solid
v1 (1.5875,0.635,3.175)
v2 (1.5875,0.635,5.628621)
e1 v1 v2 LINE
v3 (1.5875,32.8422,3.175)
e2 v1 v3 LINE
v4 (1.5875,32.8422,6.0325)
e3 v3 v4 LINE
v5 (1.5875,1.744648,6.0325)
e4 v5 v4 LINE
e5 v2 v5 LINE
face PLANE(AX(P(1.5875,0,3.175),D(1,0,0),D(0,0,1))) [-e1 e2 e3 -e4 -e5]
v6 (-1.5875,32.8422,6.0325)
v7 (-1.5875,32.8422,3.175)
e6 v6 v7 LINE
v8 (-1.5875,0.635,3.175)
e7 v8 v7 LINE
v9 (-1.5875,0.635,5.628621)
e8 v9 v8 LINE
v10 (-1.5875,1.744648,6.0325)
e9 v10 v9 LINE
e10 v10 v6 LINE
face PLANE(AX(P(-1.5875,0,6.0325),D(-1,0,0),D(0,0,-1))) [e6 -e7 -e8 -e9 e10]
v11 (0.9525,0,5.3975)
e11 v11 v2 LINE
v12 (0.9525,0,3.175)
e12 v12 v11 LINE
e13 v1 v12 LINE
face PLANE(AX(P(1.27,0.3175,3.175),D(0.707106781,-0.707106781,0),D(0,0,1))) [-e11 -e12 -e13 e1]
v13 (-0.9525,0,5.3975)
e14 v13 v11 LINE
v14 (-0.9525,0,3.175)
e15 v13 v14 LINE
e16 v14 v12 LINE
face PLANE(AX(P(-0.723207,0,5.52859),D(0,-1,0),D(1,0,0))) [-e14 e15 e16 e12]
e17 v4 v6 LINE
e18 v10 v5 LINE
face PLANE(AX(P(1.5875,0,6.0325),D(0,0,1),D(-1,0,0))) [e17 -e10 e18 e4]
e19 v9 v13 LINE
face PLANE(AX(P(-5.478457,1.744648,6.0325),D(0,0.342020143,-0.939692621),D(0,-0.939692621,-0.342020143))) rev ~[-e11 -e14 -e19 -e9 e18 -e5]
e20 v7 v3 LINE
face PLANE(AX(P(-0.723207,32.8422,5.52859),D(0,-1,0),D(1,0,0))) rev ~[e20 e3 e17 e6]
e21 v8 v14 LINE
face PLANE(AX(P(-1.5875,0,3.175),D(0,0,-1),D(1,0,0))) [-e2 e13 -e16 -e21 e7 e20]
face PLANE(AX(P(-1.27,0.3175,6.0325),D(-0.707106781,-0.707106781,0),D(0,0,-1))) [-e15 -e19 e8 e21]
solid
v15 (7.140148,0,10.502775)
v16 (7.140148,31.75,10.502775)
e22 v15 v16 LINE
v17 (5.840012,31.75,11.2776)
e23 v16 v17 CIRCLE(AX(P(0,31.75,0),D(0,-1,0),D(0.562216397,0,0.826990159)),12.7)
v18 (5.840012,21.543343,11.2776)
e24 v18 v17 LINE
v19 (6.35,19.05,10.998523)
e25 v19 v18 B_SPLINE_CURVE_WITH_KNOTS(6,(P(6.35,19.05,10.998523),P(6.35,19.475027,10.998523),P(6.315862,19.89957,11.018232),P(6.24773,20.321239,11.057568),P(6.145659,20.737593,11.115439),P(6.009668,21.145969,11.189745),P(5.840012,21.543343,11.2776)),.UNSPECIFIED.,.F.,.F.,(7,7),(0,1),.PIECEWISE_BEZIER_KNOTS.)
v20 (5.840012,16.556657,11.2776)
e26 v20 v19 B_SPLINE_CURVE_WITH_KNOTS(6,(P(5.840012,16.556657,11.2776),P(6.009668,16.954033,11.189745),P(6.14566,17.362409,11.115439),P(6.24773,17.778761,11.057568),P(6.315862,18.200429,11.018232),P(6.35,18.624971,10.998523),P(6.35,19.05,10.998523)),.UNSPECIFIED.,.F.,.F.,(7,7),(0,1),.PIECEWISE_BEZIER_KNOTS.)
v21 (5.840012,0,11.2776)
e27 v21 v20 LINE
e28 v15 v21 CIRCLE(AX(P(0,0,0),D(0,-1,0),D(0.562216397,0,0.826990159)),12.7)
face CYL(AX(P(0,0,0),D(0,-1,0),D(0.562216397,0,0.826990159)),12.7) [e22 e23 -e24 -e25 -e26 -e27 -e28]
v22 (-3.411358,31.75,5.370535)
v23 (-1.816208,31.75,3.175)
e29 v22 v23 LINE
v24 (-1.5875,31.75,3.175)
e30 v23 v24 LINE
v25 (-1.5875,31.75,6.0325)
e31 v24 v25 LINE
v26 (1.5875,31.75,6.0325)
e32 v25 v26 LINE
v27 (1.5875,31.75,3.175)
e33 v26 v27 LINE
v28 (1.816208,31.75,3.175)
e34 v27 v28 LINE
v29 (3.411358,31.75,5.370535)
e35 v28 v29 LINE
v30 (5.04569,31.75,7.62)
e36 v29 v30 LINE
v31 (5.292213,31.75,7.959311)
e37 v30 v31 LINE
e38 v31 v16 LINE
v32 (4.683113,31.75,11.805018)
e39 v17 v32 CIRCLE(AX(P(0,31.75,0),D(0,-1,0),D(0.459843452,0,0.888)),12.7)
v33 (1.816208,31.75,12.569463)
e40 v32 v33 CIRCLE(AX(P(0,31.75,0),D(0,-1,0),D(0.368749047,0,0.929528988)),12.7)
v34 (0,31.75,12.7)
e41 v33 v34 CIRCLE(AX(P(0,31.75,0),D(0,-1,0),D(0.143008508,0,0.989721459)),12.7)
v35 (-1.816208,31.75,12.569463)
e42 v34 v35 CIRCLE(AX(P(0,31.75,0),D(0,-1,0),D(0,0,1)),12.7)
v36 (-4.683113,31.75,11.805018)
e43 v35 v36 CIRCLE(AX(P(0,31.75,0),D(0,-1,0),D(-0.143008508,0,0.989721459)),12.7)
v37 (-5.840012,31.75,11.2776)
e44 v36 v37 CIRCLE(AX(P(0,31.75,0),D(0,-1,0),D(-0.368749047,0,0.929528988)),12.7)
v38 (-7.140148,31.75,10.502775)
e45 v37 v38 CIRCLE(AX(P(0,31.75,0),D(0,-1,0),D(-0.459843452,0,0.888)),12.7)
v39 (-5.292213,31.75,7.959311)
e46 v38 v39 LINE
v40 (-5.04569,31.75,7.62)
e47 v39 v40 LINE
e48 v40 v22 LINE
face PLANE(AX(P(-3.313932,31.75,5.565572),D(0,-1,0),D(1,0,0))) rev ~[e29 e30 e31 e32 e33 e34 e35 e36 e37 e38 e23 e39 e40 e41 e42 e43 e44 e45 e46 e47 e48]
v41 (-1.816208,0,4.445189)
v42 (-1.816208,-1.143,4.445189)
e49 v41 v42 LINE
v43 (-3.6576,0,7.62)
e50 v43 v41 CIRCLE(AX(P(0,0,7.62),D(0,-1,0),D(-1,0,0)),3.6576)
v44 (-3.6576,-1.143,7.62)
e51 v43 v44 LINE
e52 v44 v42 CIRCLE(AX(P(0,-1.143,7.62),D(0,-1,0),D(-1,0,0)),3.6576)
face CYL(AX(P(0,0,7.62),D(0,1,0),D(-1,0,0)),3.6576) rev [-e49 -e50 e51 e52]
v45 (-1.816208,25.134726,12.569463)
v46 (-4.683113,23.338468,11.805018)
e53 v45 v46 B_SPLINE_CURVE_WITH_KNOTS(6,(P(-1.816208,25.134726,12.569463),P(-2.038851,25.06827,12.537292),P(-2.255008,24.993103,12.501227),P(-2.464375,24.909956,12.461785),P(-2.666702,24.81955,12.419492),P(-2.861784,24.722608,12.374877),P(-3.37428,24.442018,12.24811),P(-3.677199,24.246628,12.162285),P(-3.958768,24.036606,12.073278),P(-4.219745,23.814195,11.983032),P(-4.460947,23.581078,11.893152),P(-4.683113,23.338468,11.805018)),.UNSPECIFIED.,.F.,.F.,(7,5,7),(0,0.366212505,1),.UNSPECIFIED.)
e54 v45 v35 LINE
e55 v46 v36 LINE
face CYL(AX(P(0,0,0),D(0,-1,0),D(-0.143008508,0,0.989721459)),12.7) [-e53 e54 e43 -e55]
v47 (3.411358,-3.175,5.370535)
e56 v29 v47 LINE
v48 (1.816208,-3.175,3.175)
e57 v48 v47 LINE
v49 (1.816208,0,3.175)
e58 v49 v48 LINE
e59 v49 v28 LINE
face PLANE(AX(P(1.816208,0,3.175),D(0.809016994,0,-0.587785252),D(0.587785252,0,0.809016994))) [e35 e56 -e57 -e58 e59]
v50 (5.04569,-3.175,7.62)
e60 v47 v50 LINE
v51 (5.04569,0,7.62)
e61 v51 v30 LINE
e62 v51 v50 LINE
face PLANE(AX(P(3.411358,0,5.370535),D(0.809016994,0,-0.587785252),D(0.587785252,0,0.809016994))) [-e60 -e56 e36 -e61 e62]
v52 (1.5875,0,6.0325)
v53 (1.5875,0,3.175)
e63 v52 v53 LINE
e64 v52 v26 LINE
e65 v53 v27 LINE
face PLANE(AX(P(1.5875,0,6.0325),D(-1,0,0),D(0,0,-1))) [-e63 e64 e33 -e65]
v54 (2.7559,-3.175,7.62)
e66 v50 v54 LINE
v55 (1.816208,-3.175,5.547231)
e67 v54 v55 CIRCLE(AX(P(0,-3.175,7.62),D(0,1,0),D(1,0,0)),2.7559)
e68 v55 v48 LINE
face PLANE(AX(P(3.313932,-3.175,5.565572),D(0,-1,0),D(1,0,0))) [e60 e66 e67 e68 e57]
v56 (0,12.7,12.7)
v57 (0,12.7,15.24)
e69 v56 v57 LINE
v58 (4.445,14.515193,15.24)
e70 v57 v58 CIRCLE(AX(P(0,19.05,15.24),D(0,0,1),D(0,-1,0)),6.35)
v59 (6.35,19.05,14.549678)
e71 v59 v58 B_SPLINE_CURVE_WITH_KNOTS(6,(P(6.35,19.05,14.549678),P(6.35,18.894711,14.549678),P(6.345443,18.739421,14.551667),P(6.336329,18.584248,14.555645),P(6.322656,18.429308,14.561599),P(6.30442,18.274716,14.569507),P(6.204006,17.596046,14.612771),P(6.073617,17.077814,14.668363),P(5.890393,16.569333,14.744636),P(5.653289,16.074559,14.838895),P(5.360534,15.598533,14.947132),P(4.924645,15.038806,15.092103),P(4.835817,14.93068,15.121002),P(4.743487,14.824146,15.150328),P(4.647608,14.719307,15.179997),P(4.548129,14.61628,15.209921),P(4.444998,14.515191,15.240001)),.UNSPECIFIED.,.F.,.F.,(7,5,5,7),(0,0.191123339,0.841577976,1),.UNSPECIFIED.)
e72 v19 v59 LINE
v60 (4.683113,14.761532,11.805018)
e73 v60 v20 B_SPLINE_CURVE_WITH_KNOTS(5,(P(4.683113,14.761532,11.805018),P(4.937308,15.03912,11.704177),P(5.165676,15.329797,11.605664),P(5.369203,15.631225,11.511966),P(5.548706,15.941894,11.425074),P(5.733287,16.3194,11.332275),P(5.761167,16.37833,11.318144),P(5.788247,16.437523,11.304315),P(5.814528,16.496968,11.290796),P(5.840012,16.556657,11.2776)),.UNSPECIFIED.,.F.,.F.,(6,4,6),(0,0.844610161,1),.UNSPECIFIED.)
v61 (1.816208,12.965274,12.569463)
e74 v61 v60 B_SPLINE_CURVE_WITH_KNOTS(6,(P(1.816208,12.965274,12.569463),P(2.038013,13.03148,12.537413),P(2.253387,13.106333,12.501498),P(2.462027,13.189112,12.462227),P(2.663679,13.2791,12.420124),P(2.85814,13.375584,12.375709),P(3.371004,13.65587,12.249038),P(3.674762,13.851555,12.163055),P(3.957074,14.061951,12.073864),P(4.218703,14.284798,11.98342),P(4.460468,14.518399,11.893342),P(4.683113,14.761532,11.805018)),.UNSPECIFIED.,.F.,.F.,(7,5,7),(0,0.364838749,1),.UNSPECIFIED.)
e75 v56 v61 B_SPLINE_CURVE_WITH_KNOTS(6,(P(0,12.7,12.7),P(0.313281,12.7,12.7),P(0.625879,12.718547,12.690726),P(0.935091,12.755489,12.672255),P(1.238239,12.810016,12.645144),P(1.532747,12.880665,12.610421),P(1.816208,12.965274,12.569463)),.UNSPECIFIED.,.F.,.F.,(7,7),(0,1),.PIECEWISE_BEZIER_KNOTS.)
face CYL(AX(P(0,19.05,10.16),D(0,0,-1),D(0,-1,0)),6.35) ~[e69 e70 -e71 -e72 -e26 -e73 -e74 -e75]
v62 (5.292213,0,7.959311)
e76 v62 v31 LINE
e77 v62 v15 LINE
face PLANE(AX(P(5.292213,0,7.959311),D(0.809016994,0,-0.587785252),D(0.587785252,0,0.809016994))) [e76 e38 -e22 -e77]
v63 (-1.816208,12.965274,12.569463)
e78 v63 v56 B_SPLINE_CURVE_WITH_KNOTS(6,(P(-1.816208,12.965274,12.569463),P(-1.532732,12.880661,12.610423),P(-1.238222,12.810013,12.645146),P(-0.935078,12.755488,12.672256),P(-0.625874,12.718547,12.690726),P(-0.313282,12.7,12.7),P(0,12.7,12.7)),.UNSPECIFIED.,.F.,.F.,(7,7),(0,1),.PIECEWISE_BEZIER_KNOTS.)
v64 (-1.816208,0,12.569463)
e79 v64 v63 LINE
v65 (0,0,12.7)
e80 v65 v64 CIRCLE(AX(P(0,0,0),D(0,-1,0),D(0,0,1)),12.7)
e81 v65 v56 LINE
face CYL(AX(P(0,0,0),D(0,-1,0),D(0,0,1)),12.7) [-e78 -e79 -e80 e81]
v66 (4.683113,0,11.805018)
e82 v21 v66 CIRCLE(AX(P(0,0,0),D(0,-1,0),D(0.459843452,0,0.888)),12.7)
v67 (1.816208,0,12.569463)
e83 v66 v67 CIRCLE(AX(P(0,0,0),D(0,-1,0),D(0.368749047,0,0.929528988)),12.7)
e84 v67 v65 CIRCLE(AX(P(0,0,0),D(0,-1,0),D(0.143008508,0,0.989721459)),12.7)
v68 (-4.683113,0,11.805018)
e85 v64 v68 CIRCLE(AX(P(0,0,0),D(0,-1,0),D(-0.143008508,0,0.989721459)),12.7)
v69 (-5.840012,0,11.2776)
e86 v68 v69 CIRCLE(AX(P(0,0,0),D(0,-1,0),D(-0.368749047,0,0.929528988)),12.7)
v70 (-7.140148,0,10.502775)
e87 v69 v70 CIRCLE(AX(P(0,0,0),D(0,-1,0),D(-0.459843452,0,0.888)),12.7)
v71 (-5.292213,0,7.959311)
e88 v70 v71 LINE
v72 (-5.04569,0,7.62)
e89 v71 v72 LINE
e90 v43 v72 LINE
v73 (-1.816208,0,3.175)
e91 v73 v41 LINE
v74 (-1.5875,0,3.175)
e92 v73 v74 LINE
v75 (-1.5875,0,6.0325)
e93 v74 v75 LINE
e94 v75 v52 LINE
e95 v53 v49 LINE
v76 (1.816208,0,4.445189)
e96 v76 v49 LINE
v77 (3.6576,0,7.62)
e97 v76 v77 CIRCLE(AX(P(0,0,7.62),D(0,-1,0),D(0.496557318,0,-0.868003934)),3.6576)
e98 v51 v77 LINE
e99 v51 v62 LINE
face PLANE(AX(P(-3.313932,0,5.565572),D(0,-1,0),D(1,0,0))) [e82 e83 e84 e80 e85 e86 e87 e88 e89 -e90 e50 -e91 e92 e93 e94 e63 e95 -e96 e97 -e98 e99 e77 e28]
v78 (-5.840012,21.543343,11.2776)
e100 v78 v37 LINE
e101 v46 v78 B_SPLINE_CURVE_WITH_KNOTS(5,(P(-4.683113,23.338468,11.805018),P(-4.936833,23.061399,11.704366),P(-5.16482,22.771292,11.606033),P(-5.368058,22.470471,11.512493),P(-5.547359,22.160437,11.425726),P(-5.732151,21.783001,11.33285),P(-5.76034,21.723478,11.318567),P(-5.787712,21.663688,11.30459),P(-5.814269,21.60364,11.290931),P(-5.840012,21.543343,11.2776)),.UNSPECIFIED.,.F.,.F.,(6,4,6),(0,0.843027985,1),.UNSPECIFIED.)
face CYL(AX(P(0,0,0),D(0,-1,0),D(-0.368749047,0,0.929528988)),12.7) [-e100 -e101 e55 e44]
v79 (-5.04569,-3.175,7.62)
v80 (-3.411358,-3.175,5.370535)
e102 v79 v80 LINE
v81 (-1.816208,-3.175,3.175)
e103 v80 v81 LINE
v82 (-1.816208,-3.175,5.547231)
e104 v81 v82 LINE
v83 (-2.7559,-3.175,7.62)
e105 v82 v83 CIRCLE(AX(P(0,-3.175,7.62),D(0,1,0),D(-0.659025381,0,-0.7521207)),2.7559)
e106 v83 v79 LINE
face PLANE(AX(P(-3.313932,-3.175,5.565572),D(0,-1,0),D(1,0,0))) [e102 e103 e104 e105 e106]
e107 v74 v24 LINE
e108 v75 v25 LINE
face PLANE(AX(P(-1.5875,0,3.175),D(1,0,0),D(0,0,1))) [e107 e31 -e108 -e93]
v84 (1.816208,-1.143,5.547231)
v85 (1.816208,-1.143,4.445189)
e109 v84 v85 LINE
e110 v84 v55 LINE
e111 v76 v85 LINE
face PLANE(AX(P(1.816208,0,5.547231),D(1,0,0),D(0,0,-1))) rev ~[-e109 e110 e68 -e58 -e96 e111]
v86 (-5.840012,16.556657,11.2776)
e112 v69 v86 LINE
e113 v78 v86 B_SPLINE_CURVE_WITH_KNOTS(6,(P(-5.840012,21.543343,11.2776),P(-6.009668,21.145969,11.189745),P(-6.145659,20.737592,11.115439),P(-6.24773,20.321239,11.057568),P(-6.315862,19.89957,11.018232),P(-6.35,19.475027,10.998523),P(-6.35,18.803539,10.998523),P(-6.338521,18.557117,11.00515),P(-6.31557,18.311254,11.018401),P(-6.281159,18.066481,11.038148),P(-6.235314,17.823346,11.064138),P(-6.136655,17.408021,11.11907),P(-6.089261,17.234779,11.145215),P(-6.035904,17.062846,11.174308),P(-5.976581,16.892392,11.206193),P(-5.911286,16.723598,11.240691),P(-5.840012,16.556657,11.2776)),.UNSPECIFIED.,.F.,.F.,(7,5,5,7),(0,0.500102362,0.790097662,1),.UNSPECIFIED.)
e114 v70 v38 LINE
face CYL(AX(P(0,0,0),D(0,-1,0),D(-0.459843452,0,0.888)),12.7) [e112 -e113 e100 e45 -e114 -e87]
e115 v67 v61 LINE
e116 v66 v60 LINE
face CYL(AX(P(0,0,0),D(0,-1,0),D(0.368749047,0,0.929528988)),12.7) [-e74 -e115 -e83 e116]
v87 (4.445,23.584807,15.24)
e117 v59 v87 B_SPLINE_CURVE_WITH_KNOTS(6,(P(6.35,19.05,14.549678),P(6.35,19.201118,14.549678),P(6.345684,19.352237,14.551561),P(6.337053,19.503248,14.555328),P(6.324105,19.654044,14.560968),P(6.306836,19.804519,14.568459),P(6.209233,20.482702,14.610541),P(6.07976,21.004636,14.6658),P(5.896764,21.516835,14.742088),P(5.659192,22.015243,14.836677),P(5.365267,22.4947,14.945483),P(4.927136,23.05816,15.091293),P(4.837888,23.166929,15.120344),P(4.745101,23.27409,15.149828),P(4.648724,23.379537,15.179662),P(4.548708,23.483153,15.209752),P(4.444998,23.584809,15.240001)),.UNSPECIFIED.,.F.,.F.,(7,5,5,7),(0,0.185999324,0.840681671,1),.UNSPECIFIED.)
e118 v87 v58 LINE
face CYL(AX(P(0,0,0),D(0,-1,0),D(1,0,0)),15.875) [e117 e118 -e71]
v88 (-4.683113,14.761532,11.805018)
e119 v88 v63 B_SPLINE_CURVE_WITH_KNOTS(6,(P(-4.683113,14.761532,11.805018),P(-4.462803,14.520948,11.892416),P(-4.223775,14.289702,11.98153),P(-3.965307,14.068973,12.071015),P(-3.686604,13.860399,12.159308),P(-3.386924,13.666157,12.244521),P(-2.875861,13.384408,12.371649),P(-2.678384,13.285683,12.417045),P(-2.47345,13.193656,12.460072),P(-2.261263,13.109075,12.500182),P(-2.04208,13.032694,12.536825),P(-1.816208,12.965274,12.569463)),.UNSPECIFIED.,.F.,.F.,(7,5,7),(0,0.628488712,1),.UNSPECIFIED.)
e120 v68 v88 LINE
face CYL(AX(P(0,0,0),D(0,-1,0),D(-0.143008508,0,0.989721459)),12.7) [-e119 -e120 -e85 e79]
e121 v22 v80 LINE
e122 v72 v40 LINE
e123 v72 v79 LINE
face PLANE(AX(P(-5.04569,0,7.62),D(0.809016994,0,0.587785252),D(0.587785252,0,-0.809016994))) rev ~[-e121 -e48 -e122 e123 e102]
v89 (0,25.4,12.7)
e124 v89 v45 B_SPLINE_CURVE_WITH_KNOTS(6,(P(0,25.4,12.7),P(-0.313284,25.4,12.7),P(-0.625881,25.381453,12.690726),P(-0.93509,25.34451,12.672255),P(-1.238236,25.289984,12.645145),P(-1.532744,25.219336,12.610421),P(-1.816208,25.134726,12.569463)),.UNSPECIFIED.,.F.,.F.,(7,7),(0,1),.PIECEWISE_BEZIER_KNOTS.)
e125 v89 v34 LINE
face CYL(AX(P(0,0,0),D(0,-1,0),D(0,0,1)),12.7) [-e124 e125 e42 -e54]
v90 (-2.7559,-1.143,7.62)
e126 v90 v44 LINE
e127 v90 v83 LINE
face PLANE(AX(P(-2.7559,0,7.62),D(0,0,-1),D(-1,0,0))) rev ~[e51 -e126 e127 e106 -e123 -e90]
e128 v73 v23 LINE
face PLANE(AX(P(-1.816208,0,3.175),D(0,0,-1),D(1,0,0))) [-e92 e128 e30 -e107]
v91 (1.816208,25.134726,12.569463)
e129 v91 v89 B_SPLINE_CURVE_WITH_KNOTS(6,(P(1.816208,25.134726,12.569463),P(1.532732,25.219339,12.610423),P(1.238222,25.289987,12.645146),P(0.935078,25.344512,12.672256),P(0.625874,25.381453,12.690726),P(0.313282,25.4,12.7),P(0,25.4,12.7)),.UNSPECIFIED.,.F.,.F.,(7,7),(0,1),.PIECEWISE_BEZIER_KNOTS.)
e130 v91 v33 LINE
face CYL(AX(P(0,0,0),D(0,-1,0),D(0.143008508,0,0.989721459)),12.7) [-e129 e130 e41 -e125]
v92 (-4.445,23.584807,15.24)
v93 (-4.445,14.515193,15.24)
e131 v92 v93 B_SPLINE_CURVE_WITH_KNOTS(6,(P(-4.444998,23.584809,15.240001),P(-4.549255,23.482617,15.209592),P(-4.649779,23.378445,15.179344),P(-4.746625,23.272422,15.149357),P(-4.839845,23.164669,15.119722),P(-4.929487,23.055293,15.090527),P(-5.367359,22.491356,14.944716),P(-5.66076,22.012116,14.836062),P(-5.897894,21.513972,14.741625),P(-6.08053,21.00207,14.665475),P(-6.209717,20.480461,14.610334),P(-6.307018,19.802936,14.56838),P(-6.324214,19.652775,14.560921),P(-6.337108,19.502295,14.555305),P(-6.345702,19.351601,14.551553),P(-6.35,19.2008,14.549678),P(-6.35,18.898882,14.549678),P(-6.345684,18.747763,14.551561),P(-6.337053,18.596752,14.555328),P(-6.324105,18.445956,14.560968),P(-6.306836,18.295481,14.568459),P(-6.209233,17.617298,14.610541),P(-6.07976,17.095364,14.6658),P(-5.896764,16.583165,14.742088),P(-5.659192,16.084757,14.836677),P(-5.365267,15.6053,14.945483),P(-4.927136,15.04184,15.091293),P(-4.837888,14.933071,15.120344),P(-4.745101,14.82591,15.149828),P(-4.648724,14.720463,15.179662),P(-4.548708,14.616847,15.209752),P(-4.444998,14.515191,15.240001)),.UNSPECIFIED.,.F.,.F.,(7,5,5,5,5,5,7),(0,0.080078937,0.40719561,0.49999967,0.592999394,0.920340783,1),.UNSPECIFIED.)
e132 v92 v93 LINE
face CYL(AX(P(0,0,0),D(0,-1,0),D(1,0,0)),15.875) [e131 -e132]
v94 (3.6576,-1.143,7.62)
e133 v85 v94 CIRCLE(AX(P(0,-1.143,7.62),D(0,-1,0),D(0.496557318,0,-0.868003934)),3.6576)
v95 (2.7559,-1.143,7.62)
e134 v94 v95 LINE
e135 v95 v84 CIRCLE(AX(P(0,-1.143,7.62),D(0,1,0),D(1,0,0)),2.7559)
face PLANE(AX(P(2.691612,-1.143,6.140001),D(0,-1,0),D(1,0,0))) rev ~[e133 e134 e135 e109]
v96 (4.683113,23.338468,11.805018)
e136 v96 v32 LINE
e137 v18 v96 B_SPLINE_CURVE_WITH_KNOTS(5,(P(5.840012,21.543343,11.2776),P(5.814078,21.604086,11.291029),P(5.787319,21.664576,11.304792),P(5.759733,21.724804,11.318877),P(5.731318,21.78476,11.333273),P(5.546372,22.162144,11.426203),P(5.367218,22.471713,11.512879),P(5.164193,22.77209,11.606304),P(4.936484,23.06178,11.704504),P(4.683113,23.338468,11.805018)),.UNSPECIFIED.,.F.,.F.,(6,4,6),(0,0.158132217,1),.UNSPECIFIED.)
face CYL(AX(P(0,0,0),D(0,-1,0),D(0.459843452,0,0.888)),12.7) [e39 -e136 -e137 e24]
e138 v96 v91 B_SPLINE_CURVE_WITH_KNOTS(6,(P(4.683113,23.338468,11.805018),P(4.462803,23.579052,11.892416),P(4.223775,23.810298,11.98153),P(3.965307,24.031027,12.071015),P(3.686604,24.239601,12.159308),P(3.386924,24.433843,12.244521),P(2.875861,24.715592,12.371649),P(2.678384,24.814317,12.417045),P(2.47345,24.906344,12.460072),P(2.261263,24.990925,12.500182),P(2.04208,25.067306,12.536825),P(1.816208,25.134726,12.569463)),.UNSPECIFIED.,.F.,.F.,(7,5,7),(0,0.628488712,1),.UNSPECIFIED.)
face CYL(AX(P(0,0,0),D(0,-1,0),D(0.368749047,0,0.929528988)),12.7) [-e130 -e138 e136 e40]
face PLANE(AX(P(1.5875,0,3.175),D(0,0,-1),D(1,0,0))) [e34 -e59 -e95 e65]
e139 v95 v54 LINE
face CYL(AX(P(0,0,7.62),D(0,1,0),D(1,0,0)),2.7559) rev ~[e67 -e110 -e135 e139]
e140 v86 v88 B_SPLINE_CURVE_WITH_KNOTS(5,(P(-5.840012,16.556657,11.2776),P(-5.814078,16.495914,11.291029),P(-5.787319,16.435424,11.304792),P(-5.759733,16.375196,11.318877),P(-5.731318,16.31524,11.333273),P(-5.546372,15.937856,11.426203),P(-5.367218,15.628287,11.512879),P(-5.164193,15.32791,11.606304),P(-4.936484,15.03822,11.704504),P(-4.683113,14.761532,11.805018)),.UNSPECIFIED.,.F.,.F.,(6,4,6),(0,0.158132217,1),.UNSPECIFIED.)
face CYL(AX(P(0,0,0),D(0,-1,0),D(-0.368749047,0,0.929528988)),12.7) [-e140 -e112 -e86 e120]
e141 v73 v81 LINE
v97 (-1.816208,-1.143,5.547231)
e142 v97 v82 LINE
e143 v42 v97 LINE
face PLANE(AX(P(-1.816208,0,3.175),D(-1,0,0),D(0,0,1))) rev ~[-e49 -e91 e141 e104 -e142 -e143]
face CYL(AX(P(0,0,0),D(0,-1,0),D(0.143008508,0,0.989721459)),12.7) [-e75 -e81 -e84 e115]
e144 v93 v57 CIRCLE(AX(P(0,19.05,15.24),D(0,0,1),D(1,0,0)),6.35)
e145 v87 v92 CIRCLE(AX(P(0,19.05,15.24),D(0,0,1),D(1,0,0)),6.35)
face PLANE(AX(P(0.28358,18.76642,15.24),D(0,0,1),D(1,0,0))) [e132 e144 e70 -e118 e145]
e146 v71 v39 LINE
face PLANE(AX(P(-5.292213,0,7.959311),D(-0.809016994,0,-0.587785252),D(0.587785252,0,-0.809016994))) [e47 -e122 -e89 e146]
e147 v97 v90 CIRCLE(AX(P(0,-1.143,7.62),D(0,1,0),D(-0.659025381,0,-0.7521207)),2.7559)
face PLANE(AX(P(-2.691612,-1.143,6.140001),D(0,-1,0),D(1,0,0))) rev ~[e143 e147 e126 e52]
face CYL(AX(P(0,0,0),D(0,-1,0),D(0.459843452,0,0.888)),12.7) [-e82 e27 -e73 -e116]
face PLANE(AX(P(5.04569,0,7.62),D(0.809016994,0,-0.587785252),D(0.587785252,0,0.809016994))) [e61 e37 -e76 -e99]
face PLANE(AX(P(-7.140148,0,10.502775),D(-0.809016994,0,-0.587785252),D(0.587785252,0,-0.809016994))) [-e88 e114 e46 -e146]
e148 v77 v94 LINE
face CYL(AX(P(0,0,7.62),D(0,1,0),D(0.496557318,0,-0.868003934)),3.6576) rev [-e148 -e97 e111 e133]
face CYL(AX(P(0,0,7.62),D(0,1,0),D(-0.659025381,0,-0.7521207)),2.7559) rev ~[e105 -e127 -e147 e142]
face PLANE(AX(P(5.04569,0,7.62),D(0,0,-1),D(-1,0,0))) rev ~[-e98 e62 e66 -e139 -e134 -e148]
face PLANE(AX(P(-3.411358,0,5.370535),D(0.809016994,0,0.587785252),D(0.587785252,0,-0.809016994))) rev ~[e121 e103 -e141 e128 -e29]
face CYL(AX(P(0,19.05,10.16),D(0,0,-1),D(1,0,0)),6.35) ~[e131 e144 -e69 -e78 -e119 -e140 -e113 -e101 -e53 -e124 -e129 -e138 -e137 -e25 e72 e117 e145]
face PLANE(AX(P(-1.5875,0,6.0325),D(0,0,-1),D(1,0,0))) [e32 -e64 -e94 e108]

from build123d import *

# Parameters (mm, degrees)
F1_DEPTH     = 31.75
F2_DEPTH     = 3.175
F3_DEPTH     = 1.143
F4_DEPTH     = 32.8422
F7_DEPTH     = 5.08
F8_R         = 19.05
F8_R_2       = 15.875
F9_DEPTH     = 50.8
F11_SIZE     = 0.635
F12_T1_DEPTH = 10.9569141407


# Not quite as in the source:
# - a fillet or chamfer that OpenCascade refuses, or shapes differently, is made with other operations: its cross-section is extruded or revolved along the edge and cut away or added


with BuildPart() as f1:
    # F0 (on Front) → F1 (new body)
    with BuildSketch(Plane.XZ):
        with BuildLine():
            Line((-3.96875, 7.62), (-5.0456895848, 7.62))
            Line((-5.0456895848, 7.62), (-3.4113577324, 5.3705351863))
            Line((-3.4113577324, 5.3705351863), (-1.8162080478, 3.175))
            Line((-1.8162080478, 3.175), (-1.8162080478, 4.0912091463))
            ThreePointArc((-1.8162080478, 4.0912091463), (-3.3881449388, 5.5532512402), (-3.96875, 7.62))
        make_face()
        with BuildLine():
            Line((-5.2922131397, 7.9593105639), (-5.0456895848, 7.62))
            Line((-5.0456895848, 7.62), (-3.96875, 7.62))
            ThreePointArc((-3.96875, 7.62), (-3.3881449388, 9.6867487598), (-1.8162080478, 11.1487908537))
            Line((-1.8162080478, 11.1487908537), (-1.8162080478, 11.2776))
            Line((-1.8162080478, 11.2776), (-4.4524904002, 11.2776))
            ThreePointArc((-4.4524904002, 11.2776), (-4.386898372, 9.4956069696), (-5.2922131397, 7.9593105639))
        make_face()
        with BuildLine():
            Line((-1.8162080478, 4.0912091463), (-1.8162080478, 3.175))
            Line((-1.8162080478, 3.175), (-1.5875, 3.175))
            Line((-1.5875, 3.175), (-1.5875, 3.9825805421))
            ThreePointArc((-1.5875, 3.9825805421), (-1.7027205179, 4.0350705167), (-1.8162080478, 4.0912091463))
        make_face()
        with BuildLine():
            Line((3.96875, 7.62), (5.0456895848, 7.62))
            Line((5.0456895848, 7.62), (5.2922131397, 7.9593105639))
            ThreePointArc((5.2922131397, 7.9593105639), (4.386898372, 9.4956069696), (4.4524904002, 11.2776))
            Line((4.4524904002, 11.2776), (1.8162080478, 11.2776))
            Line((1.8162080478, 11.2776), (1.8162080478, 11.1487908537))
            ThreePointArc((1.8162080478, 11.1487908537), (3.3881449388, 9.6867487598), (3.96875, 7.62))
        make_face()
        with BuildLine():
            Line((3.4113577324, 5.3705351863), (5.0456895848, 7.62))
            Line((5.0456895848, 7.62), (3.96875, 7.62))
            ThreePointArc((3.96875, 7.62), (3.3881449388, 5.5532512402), (1.8162080478, 4.0912091463))
            Line((1.8162080478, 4.0912091463), (1.8162080478, 3.175))
            Line((1.8162080478, 3.175), (3.4113577324, 5.3705351863))
        make_face()
        with BuildLine():
            Line((1.5875, 3.175), (1.8162080478, 3.175))
            Line((1.8162080478, 3.175), (1.8162080478, 4.0912091463))
            ThreePointArc((1.8162080478, 4.0912091463), (1.7027205179, 4.0350705167), (1.5875, 3.9825805421))
            Line((1.5875, 3.9825805421), (1.5875, 3.175))
        make_face()
        with BuildLine():
            Line((-7.1401482368, 10.5027750217), (-5.2922131397, 7.9593105639))
            ThreePointArc((-5.2922131397, 7.9593105639), (-4.386898372, 9.4956069696), (-4.4524904002, 11.2776))
            Line((-4.4524904002, 11.2776), (-5.8400118356, 11.2776))
            ThreePointArc((-5.8400118356, 11.2776), (-6.5016326652, 10.9095725254), (-7.1401482368, 10.5027750217))
        make_face()
        with BuildLine():
            Line((-3.6576, 7.62), (-3.96875, 7.62))
            ThreePointArc((-3.96875, 7.62), (-3.3881449388, 5.5532512402), (-1.8162080478, 4.0912091463))
            Line((-1.8162080478, 4.0912091463), (-1.8162080478, 4.4451888108))
            ThreePointArc((-1.8162080478, 4.4451888108), (-3.1639374453, 5.7849148243), (-3.6576, 7.62))
        make_face()
        with BuildLine():
            ThreePointArc((-1.8162080478, 11.1487908537), (-3.3881449388, 9.6867487598), (-3.96875, 7.62))
            Line((-3.96875, 7.62), (-3.6576, 7.62))
            ThreePointArc((-3.6576, 7.62), (-3.1639374453, 9.4550851757), (-1.8162080478, 10.7948111892))
            Line((-1.8162080478, 10.7948111892), (-1.8162080478, 11.1487908537))
        make_face()
        with BuildLine():
            Line((-1.8162080478, 4.4451888108), (-1.8162080478, 4.0912091463))
            ThreePointArc((-1.8162080478, 4.0912091463), (-1.7027205179, 4.0350705167), (-1.5875, 3.9825805421))
            Line((-1.5875, 3.9825805421), (-1.5875, 4.3248700314))
            ThreePointArc((-1.5875, 4.3248700314), (-1.7029169889, 4.3830088834), (-1.8162080478, 4.4451888108))
        make_face()
        with BuildLine():
            ThreePointArc((4.4524904002, 11.2776), (4.386898372, 9.4956069696), (5.2922131397, 7.9593105639))
            Line((5.2922131397, 7.9593105639), (7.1401482368, 10.5027750217))
            ThreePointArc((7.1401482368, 10.5027750217), (6.5016326652, 10.9095725254), (5.8400118356, 11.2776))
            Line((5.8400118356, 11.2776), (4.4524904002, 11.2776))
        make_face()
        with BuildLine():
            Line((3.6576, 7.62), (3.96875, 7.62))
            ThreePointArc((3.96875, 7.62), (3.3881449388, 9.6867487598), (1.8162080478, 11.1487908537))
            Line((1.8162080478, 11.1487908537), (1.8162080478, 10.7948111892))
            ThreePointArc((1.8162080478, 10.7948111892), (3.1639374453, 9.4550851757), (3.6576, 7.62))
        make_face()
        with BuildLine():
            ThreePointArc((1.8162080478, 4.0912091463), (3.3881449388, 5.5532512402), (3.96875, 7.62))
            Line((3.96875, 7.62), (3.6576, 7.62))
            ThreePointArc((3.6576, 7.62), (3.1639374453, 5.7849148243), (1.8162080478, 4.4451888108))
            Line((1.8162080478, 4.4451888108), (1.8162080478, 4.0912091463))
        make_face()
        with BuildLine():
            ThreePointArc((1.5875, 3.9825805421), (1.7027205179, 4.0350705167), (1.8162080478, 4.0912091463))
            Line((1.8162080478, 4.0912091463), (1.8162080478, 4.4451888108))
            ThreePointArc((1.8162080478, 4.4451888108), (1.7029169889, 4.3830088834), (1.5875, 4.3248700314))
            Line((1.5875, 4.3248700314), (1.5875, 3.9825805421))
        make_face()
        with BuildLine():
            ThreePointArc((-4.6831128955, 11.8050181537), (-4.5558242029, 11.5465464169), (-4.4524904002, 11.2776))
            Line((-4.4524904002, 11.2776), (-1.8162080478, 11.2776))
            Line((-1.8162080478, 11.2776), (-1.8162080478, 12.5694625313))
            ThreePointArc((-1.8162080478, 12.5694625313), (-3.2720615799, 12.2712514854), (-4.6831128955, 11.8050181537))
        make_face()
        with BuildLine():
            Line((-5.8400118356, 11.2776), (-4.4524904002, 11.2776))
            ThreePointArc((-4.4524904002, 11.2776), (-4.5558242029, 11.5465464169), (-4.6831128955, 11.8050181537))
            ThreePointArc((-4.6831128955, 11.8050181537), (-5.2681667593, 11.5557959049), (-5.8400118356, 11.2776))
        make_face()
        with BuildLine():
            Line((-1.8162080478, 11.2776), (-1.8162080478, 11.1487908537))
            ThreePointArc((-1.8162080478, 11.1487908537), (-1.6795566201, 11.2158401136), (-1.5404346148, 11.2776))
            Line((-1.5404346148, 11.2776), (-1.8162080478, 11.2776))
        make_face()
        with BuildLine():
            ThreePointArc((-1.5404346148, 11.2776), (-1.6795566201, 11.2158401136), (-1.8162080478, 11.1487908537))
            Line((-1.8162080478, 11.1487908537), (-1.8162080478, 10.7948111892))
            ThreePointArc((-1.8162080478, 10.7948111892), (-0.939640451, 11.1548427946), (0, 11.2776))
            Line((0, 11.2776), (-1.5404346148, 11.2776))
        make_face()
        with BuildLine():
            Line((-2.7559, 7.62), (-3.6576, 7.62))
            ThreePointArc((-3.6576, 7.62), (-3.1639374453, 5.7849148243), (-1.8162080478, 4.4451888108))
            Line((-1.8162080478, 4.4451888108), (-1.8162080478, 5.5472305635))
            ThreePointArc((-1.8162080478, 5.5472305635), (-2.510007228, 6.4820858884), (-2.7559, 7.62))
        make_face()
        with BuildLine():
            ThreePointArc((-1.8162080478, 10.7948111892), (-3.1639374453, 9.4550851757), (-3.6576, 7.62))
            Line((-3.6576, 7.62), (-2.7559, 7.62))
            ThreePointArc((-2.7559, 7.62), (-2.510007228, 8.7579141116), (-1.8162080478, 9.6927694365))
            Line((-1.8162080478, 9.6927694365), (-1.8162080478, 10.7948111892))
        make_face()
        with BuildLine():
            Line((-1.8162080478, 5.5472305635), (-1.8162080478, 4.4451888108))
            ThreePointArc((-1.8162080478, 4.4451888108), (-1.7029169889, 4.3830088834), (-1.5875, 4.3248700314))
            Line((-1.5875, 4.3248700314), (-1.5875, 5.3672619859))
            ThreePointArc((-1.5875, 5.3672619859), (-1.7042312903, 5.454225192), (-1.8162080478, 5.5472305635))
        make_face()
        with BuildLine():
            ThreePointArc((4.6831128955, 11.8050181537), (4.5558242029, 11.5465464169), (4.4524904002, 11.2776))
            Line((4.4524904002, 11.2776), (5.8400118356, 11.2776))
            ThreePointArc((5.8400118356, 11.2776), (5.2681667593, 11.5557959049), (4.6831128955, 11.8050181537))
        make_face()
        with BuildLine():
            Line((1.8162080478, 11.2776), (4.4524904002, 11.2776))
            ThreePointArc((4.4524904002, 11.2776), (4.5558242029, 11.5465464169), (4.6831128955, 11.8050181537))
            ThreePointArc((4.6831128955, 11.8050181537), (3.2720615799, 12.2712514854), (1.8162080478, 12.5694625313))
            Line((1.8162080478, 12.5694625313), (1.8162080478, 11.2776))
        make_face()
        with BuildLine():
            Line((1.8162080478, 10.7948111892), (1.8162080478, 11.1487908537))
            ThreePointArc((1.8162080478, 11.1487908537), (1.6795566201, 11.2158401136), (1.5404346148, 11.2776))
            Line((1.5404346148, 11.2776), (0, 11.2776))
            ThreePointArc((0, 11.2776), (0.939640451, 11.1548427946), (1.8162080478, 10.7948111892))
        make_face()
        with BuildLine():
            ThreePointArc((1.5404346148, 11.2776), (1.6795566201, 11.2158401136), (1.8162080478, 11.1487908537))
            Line((1.8162080478, 11.1487908537), (1.8162080478, 11.2776))
            Line((1.8162080478, 11.2776), (1.5404346148, 11.2776))
        make_face()
        with BuildLine():
            Line((2.7559, 7.62), (3.6576, 7.62))
            ThreePointArc((3.6576, 7.62), (3.1639374453, 9.4550851757), (1.8162080478, 10.7948111892))
            Line((1.8162080478, 10.7948111892), (1.8162080478, 9.6927694365))
            ThreePointArc((1.8162080478, 9.6927694365), (2.510007228, 8.7579141116), (2.7559, 7.62))
        make_face()
        with BuildLine():
            ThreePointArc((1.8162080478, 4.4451888108), (3.1639374453, 5.7849148243), (3.6576, 7.62))
            Line((3.6576, 7.62), (2.7559, 7.62))
            ThreePointArc((2.7559, 7.62), (2.510007228, 6.4820858884), (1.8162080478, 5.5472305635))
            Line((1.8162080478, 5.5472305635), (1.8162080478, 4.4451888108))
        make_face()
        with BuildLine():
            ThreePointArc((1.5875, 4.3248700314), (1.7029169889, 4.3830088834), (1.8162080478, 4.4451888108))
            Line((1.8162080478, 4.4451888108), (1.8162080478, 5.5472305635))
            ThreePointArc((1.8162080478, 5.5472305635), (1.7042312903, 5.454225192), (1.5875, 5.3672619859))
            Line((1.5875, 5.3672619859), (1.5875, 4.3248700314))
        make_face()
        with BuildLine():
            Line((-1.8162080478, 12.5694625313), (-1.8162080478, 11.2776))
            Line((-1.8162080478, 11.2776), (-1.5404346148, 11.2776))
            ThreePointArc((-1.5404346148, 11.2776), (-0.7857724106, 11.5101848647), (0, 11.58875))
            Line((0, 11.58875), (0, 12.7))
            ThreePointArc((0, 12.7), (-0.910446553, 12.6673235955), (-1.8162080478, 12.5694625313))
        make_face()
        with BuildLine():
            ThreePointArc((0, 11.58875), (-0.7857724106, 11.5101848647), (-1.5404346148, 11.2776))
            Line((-1.5404346148, 11.2776), (0, 11.2776))
            Line((0, 11.2776), (0, 11.58875))
        make_face()
        with BuildLine():
            ThreePointArc((0, 11.2776), (-0.939640451, 11.1548427946), (-1.8162080478, 10.7948111892))
            Line((-1.8162080478, 10.7948111892), (-1.8162080478, 9.6927694365))
            ThreePointArc((-1.8162080478, 9.6927694365), (-0.970216347, 10.1994699165), (0, 10.3759))
            Line((0, 10.3759), (0, 11.2776))
        make_face()
        with BuildLine():
            Line((-1.8162080478, 7.62), (-2.7559, 7.62))
            ThreePointArc((-2.7559, 7.62), (-2.510007228, 6.4820858884), (-1.8162080478, 5.5472305635))
            Line((-1.8162080478, 5.5472305635), (-1.8162080478, 6.0325))
            Line((-1.8162080478, 6.0325), (-1.8162080478, 7.62))
        make_face()
        with BuildLine():
            ThreePointArc((-1.8162080478, 9.6927694365), (-2.510007228, 8.7579141116), (-2.7559, 7.62))
            Line((-2.7559, 7.62), (-1.8162080478, 7.62))
            Line((-1.8162080478, 7.62), (-1.8162080478, 9.525))
            Line((-1.8162080478, 9.525), (-1.8162080478, 9.6927694365))
        make_face()
        with BuildLine():
            Line((-1.8162080478, 6.0325), (-1.8162080478, 5.5472305635))
            ThreePointArc((-1.8162080478, 5.5472305635), (-1.7042312903, 5.454225192), (-1.5875, 5.3672619859))
            Line((-1.5875, 5.3672619859), (-1.5875, 6.0325))
            Line((-1.5875, 6.0325), (-1.8162080478, 6.0325))
        make_face()
        with BuildLine():
            Line((1.5404346148, 11.2776), (1.8162080478, 11.2776))
            Line((1.8162080478, 11.2776), (1.8162080478, 12.5694625313))
            ThreePointArc((1.8162080478, 12.5694625313), (0.910446553, 12.6673235955), (0, 12.7))
            Line((0, 12.7), (0, 11.58875))
            ThreePointArc((0, 11.58875), (0.7857724106, 11.5101848647), (1.5404346148, 11.2776))
        make_face()
        with BuildLine():
            Line((0, 11.2776), (1.5404346148, 11.2776))
            ThreePointArc((1.5404346148, 11.2776), (0.7857724106, 11.5101848647), (0, 11.58875))
            Line((0, 11.58875), (0, 11.2776))
        make_face()
        with BuildLine():
            Line((1.8162080478, 9.6927694365), (1.8162080478, 10.7948111892))
            ThreePointArc((1.8162080478, 10.7948111892), (0.939640451, 11.1548427946), (0, 11.2776))
            Line((0, 11.2776), (0, 10.3759))
            ThreePointArc((0, 10.3759), (0.970216347, 10.1994699165), (1.8162080478, 9.6927694365))
        make_face()
        with BuildLine():
            Line((1.8162080478, 7.62), (2.7559, 7.62))
            ThreePointArc((2.7559, 7.62), (2.510007228, 8.7579141116), (1.8162080478, 9.6927694365))
            Line((1.8162080478, 9.6927694365), (1.8162080478, 9.525))
            Line((1.8162080478, 9.525), (1.8162080478, 7.62))
        make_face()
        with BuildLine():
            ThreePointArc((1.8162080478, 5.5472305635), (2.510007228, 6.4820858884), (2.7559, 7.62))
            Line((2.7559, 7.62), (1.8162080478, 7.62))
            Line((1.8162080478, 7.62), (1.8162080478, 6.0325))
            Line((1.8162080478, 6.0325), (1.8162080478, 5.5472305635))
        make_face()
        with BuildLine():
            ThreePointArc((1.5875, 5.3672619859), (1.7042312903, 5.454225192), (1.8162080478, 5.5472305635))
            Line((1.8162080478, 5.5472305635), (1.8162080478, 6.0325))
            Line((1.8162080478, 6.0325), (1.5875, 6.0325))
            Line((1.5875, 6.0325), (1.5875, 5.3672619859))
        make_face()
        Polygon((-1.5875, 6.0325), (0, 6.0325), (1.5875, 6.0325), (1.8162080478, 6.0325), (1.8162080478, 7.62), (0, 7.62), (-1.8162080478, 7.62), (-1.8162080478, 6.0325), align=None)
        with BuildLine():
            ThreePointArc((0, 10.3759), (-0.970216347, 10.1994699165), (-1.8162080478, 9.6927694365))
            Line((-1.8162080478, 9.6927694365), (-1.8162080478, 9.525))
            Line((-1.8162080478, 9.525), (0, 9.525))
            Line((0, 9.525), (0, 10.3759))
        make_face()
        Polygon((-1.8162080478, 9.525), (-1.8162080478, 7.62), (0, 7.62), (1.8162080478, 7.62), (1.8162080478, 9.525), (0, 9.525), align=None)
        with BuildLine():
            Line((1.8162080478, 9.525), (1.8162080478, 9.6927694365))
            ThreePointArc((1.8162080478, 9.6927694365), (0.970216347, 10.1994699165), (0, 10.3759))
            Line((0, 10.3759), (0, 9.525))
            Line((0, 9.525), (1.8162080478, 9.525))
        make_face()
    extrude(amount=-F1_DEPTH)

    # F0 (on Front) → F2 (join)
    with BuildSketch(Plane.XZ):
        with BuildLine():
            Line((-3.96875, 7.62), (-5.0456895848, 7.62))
            Line((-5.0456895848, 7.62), (-3.4113577324, 5.3705351863))
            Line((-3.4113577324, 5.3705351863), (-1.8162080478, 3.175))
            Line((-1.8162080478, 3.175), (-1.8162080478, 4.0912091463))
            ThreePointArc((-1.8162080478, 4.0912091463), (-3.3881449388, 5.5532512402), (-3.96875, 7.62))
        make_face()
        with BuildLine():
            Line((3.4113577324, 5.3705351863), (5.0456895848, 7.62))
            Line((5.0456895848, 7.62), (3.96875, 7.62))
            ThreePointArc((3.96875, 7.62), (3.3881449388, 5.5532512402), (1.8162080478, 4.0912091463))
            Line((1.8162080478, 4.0912091463), (1.8162080478, 3.175))
            Line((1.8162080478, 3.175), (3.4113577324, 5.3705351863))
        make_face()
        with BuildLine():
            Line((-3.6576, 7.62), (-3.96875, 7.62))
            ThreePointArc((-3.96875, 7.62), (-3.3881449388, 5.5532512402), (-1.8162080478, 4.0912091463))
            Line((-1.8162080478, 4.0912091463), (-1.8162080478, 4.4451888108))
            ThreePointArc((-1.8162080478, 4.4451888108), (-3.1639374453, 5.7849148243), (-3.6576, 7.62))
        make_face()
        with BuildLine():
            ThreePointArc((1.8162080478, 4.0912091463), (3.3881449388, 5.5532512402), (3.96875, 7.62))
            Line((3.96875, 7.62), (3.6576, 7.62))
            ThreePointArc((3.6576, 7.62), (3.1639374453, 5.7849148243), (1.8162080478, 4.4451888108))
            Line((1.8162080478, 4.4451888108), (1.8162080478, 4.0912091463))
        make_face()
        with BuildLine():
            Line((-2.7559, 7.62), (-3.6576, 7.62))
            ThreePointArc((-3.6576, 7.62), (-3.1639374453, 5.7849148243), (-1.8162080478, 4.4451888108))
            Line((-1.8162080478, 4.4451888108), (-1.8162080478, 5.5472305635))
            ThreePointArc((-1.8162080478, 5.5472305635), (-2.510007228, 6.4820858884), (-2.7559, 7.62))
        make_face()
        with BuildLine():
            ThreePointArc((1.8162080478, 4.4451888108), (3.1639374453, 5.7849148243), (3.6576, 7.62))
            Line((3.6576, 7.62), (2.7559, 7.62))
            ThreePointArc((2.7559, 7.62), (2.510007228, 6.4820858884), (1.8162080478, 5.5472305635))
            Line((1.8162080478, 5.5472305635), (1.8162080478, 4.4451888108))
        make_face()
    extrude(amount=F2_DEPTH)

    # F0 (on Front) → F3 (cut)
    with BuildSketch(Plane.XZ):
        with BuildLine():
            Line((-2.7559, 7.62), (-3.6576, 7.62))
            ThreePointArc((-3.6576, 7.62), (-3.1639374453, 5.7849148243), (-1.8162080478, 4.4451888108))
            Line((-1.8162080478, 4.4451888108), (-1.8162080478, 5.5472305635))
            ThreePointArc((-1.8162080478, 5.5472305635), (-2.510007228, 6.4820858884), (-2.7559, 7.62))
        make_face()
        with BuildLine():
            ThreePointArc((1.8162080478, 4.4451888108), (3.1639374453, 5.7849148243), (3.6576, 7.62))
            Line((3.6576, 7.62), (2.7559, 7.62))
            ThreePointArc((2.7559, 7.62), (2.510007228, 6.4820858884), (1.8162080478, 5.5472305635))
            Line((1.8162080478, 5.5472305635), (1.8162080478, 4.4451888108))
        make_face()
        with BuildLine():
            Line((1.8162080478, 9.6927694365), (1.8162080478, 10.7948111892))
            ThreePointArc((1.8162080478, 10.7948111892), (0.939640451, 11.1548427946), (0, 11.2776))
            Line((0, 11.2776), (0, 10.3759))
            ThreePointArc((0, 10.3759), (0.970216347, 10.1994699165), (1.8162080478, 9.6927694365))
        make_face()
    extrude(amount=F3_DEPTH, mode=Mode.SUBTRACT)

    # F6 (on offset) → F7 (join)
    with BuildSketch(Plane.XY.offset(10.16)):
        with BuildLine():
            ThreePointArc((0, 12.7), (4.4901280605, 14.5598719395), (6.35, 19.05))
            ThreePointArc((6.35, 19.05), (-4.4901280605, 23.5401280605), (0, 12.7))
        make_face()
    extrude(amount=F7_DEPTH)

    # F8 (on Front) → F9 (cut)
    with BuildSketch(Plane.XZ):
        Circle(F8_R)
        Circle(F8_R_2, mode=Mode.SUBTRACT)
    extrude(amount=-F9_DEPTH, mode=Mode.SUBTRACT)


with BuildPart() as f4:
    # F0 (on Front) → F4 (new body)
    with BuildSketch(Plane.XZ):
        with BuildLine():
            ThreePointArc((-1.5875, 5.3672619859), (-0.8326656343, 4.9929003157), (0, 4.8641))
            Line((0, 4.8641), (0, 6.0325))
            Line((0, 6.0325), (-1.5875, 6.0325))
            Line((-1.5875, 6.0325), (-1.5875, 5.3672619859))
        make_face()
        with BuildLine():
            Line((0, 6.0325), (0, 4.8641))
            ThreePointArc((0, 4.8641), (0.8326656343, 4.9929003157), (1.5875, 5.3672619859))
            Line((1.5875, 5.3672619859), (1.5875, 6.0325))
            Line((1.5875, 6.0325), (0, 6.0325))
        make_face()
        with BuildLine():
            Line((0, 4.8641), (0, 3.9624))
            ThreePointArc((0, 3.9624), (0.8141776179, 4.0541687412), (1.5875, 4.3248700314))
            Line((1.5875, 4.3248700314), (1.5875, 5.3672619859))
            ThreePointArc((1.5875, 5.3672619859), (0.8326656343, 4.9929003157), (0, 4.8641))
        make_face()
        with BuildLine():
            ThreePointArc((-1.5875, 4.3248700314), (-0.8141776179, 4.0541687412), (0, 3.9624))
            Line((0, 3.9624), (0, 4.8641))
            ThreePointArc((0, 4.8641), (-0.8326656343, 4.9929003157), (-1.5875, 5.3672619859))
            Line((-1.5875, 5.3672619859), (-1.5875, 4.3248700314))
        make_face()
        with BuildLine():
            ThreePointArc((-1.5875, 3.9825805421), (-0.8108538984, 3.7349655706), (0, 3.65125))
            Line((0, 3.65125), (0, 3.9624))
            ThreePointArc((0, 3.9624), (-0.8141776179, 4.0541687412), (-1.5875, 4.3248700314))
            Line((-1.5875, 4.3248700314), (-1.5875, 3.9825805421))
        make_face()
        with BuildLine():
            Line((0, 3.9624), (0, 3.65125))
            ThreePointArc((0, 3.65125), (0.8108538984, 3.7349655706), (1.5875, 3.9825805421))
            Line((1.5875, 3.9825805421), (1.5875, 4.3248700314))
            ThreePointArc((1.5875, 4.3248700314), (0.8141776179, 4.0541687412), (0, 3.9624))
        make_face()
        with BuildLine():
            Line((0, 3.65125), (0, 3.175))
            Line((0, 3.175), (0.79375, 3.175))
            Line((0.79375, 3.175), (1.5875, 3.175))
            Line((1.5875, 3.175), (1.5875, 3.9825805421))
            ThreePointArc((1.5875, 3.9825805421), (0.8108538984, 3.7349655706), (0, 3.65125))
        make_face()
        with BuildLine():
            Line((-0.79375, 3.175), (0, 3.175))
            Line((0, 3.175), (0, 3.65125))
            ThreePointArc((0, 3.65125), (-0.8108538984, 3.7349655706), (-1.5875, 3.9825805421))
            Line((-1.5875, 3.9825805421), (-1.5875, 3.175))
            Line((-1.5875, 3.175), (-0.79375, 3.175))
        make_face()
    extrude(amount=-F4_DEPTH)

    # F11
    f11_edges = [f4.edges().sort_by_distance(p)[0] for p in [
        (-1.5875, 0, 4.60375),
        (1.5875, 0, 4.60375),
    ]]
    chamfer(f11_edges, length=F11_SIZE)

    # F12: chamfer of 0.635 x 1.7446481614 on 1 edges, made by hand

    # F12_s2 → F12_t1 (cut)
    with BuildSketch(Plane.YZ.offset(-5.4784570703)):
        Polygon((1.7446481614, 6.0325), (0, 5.3975), (0, 6.0325), align=None)
    extrude(amount=F12_T1_DEPTH, mode=Mode.SUBTRACT)


solid = Compound([f1.part, f4.part])
